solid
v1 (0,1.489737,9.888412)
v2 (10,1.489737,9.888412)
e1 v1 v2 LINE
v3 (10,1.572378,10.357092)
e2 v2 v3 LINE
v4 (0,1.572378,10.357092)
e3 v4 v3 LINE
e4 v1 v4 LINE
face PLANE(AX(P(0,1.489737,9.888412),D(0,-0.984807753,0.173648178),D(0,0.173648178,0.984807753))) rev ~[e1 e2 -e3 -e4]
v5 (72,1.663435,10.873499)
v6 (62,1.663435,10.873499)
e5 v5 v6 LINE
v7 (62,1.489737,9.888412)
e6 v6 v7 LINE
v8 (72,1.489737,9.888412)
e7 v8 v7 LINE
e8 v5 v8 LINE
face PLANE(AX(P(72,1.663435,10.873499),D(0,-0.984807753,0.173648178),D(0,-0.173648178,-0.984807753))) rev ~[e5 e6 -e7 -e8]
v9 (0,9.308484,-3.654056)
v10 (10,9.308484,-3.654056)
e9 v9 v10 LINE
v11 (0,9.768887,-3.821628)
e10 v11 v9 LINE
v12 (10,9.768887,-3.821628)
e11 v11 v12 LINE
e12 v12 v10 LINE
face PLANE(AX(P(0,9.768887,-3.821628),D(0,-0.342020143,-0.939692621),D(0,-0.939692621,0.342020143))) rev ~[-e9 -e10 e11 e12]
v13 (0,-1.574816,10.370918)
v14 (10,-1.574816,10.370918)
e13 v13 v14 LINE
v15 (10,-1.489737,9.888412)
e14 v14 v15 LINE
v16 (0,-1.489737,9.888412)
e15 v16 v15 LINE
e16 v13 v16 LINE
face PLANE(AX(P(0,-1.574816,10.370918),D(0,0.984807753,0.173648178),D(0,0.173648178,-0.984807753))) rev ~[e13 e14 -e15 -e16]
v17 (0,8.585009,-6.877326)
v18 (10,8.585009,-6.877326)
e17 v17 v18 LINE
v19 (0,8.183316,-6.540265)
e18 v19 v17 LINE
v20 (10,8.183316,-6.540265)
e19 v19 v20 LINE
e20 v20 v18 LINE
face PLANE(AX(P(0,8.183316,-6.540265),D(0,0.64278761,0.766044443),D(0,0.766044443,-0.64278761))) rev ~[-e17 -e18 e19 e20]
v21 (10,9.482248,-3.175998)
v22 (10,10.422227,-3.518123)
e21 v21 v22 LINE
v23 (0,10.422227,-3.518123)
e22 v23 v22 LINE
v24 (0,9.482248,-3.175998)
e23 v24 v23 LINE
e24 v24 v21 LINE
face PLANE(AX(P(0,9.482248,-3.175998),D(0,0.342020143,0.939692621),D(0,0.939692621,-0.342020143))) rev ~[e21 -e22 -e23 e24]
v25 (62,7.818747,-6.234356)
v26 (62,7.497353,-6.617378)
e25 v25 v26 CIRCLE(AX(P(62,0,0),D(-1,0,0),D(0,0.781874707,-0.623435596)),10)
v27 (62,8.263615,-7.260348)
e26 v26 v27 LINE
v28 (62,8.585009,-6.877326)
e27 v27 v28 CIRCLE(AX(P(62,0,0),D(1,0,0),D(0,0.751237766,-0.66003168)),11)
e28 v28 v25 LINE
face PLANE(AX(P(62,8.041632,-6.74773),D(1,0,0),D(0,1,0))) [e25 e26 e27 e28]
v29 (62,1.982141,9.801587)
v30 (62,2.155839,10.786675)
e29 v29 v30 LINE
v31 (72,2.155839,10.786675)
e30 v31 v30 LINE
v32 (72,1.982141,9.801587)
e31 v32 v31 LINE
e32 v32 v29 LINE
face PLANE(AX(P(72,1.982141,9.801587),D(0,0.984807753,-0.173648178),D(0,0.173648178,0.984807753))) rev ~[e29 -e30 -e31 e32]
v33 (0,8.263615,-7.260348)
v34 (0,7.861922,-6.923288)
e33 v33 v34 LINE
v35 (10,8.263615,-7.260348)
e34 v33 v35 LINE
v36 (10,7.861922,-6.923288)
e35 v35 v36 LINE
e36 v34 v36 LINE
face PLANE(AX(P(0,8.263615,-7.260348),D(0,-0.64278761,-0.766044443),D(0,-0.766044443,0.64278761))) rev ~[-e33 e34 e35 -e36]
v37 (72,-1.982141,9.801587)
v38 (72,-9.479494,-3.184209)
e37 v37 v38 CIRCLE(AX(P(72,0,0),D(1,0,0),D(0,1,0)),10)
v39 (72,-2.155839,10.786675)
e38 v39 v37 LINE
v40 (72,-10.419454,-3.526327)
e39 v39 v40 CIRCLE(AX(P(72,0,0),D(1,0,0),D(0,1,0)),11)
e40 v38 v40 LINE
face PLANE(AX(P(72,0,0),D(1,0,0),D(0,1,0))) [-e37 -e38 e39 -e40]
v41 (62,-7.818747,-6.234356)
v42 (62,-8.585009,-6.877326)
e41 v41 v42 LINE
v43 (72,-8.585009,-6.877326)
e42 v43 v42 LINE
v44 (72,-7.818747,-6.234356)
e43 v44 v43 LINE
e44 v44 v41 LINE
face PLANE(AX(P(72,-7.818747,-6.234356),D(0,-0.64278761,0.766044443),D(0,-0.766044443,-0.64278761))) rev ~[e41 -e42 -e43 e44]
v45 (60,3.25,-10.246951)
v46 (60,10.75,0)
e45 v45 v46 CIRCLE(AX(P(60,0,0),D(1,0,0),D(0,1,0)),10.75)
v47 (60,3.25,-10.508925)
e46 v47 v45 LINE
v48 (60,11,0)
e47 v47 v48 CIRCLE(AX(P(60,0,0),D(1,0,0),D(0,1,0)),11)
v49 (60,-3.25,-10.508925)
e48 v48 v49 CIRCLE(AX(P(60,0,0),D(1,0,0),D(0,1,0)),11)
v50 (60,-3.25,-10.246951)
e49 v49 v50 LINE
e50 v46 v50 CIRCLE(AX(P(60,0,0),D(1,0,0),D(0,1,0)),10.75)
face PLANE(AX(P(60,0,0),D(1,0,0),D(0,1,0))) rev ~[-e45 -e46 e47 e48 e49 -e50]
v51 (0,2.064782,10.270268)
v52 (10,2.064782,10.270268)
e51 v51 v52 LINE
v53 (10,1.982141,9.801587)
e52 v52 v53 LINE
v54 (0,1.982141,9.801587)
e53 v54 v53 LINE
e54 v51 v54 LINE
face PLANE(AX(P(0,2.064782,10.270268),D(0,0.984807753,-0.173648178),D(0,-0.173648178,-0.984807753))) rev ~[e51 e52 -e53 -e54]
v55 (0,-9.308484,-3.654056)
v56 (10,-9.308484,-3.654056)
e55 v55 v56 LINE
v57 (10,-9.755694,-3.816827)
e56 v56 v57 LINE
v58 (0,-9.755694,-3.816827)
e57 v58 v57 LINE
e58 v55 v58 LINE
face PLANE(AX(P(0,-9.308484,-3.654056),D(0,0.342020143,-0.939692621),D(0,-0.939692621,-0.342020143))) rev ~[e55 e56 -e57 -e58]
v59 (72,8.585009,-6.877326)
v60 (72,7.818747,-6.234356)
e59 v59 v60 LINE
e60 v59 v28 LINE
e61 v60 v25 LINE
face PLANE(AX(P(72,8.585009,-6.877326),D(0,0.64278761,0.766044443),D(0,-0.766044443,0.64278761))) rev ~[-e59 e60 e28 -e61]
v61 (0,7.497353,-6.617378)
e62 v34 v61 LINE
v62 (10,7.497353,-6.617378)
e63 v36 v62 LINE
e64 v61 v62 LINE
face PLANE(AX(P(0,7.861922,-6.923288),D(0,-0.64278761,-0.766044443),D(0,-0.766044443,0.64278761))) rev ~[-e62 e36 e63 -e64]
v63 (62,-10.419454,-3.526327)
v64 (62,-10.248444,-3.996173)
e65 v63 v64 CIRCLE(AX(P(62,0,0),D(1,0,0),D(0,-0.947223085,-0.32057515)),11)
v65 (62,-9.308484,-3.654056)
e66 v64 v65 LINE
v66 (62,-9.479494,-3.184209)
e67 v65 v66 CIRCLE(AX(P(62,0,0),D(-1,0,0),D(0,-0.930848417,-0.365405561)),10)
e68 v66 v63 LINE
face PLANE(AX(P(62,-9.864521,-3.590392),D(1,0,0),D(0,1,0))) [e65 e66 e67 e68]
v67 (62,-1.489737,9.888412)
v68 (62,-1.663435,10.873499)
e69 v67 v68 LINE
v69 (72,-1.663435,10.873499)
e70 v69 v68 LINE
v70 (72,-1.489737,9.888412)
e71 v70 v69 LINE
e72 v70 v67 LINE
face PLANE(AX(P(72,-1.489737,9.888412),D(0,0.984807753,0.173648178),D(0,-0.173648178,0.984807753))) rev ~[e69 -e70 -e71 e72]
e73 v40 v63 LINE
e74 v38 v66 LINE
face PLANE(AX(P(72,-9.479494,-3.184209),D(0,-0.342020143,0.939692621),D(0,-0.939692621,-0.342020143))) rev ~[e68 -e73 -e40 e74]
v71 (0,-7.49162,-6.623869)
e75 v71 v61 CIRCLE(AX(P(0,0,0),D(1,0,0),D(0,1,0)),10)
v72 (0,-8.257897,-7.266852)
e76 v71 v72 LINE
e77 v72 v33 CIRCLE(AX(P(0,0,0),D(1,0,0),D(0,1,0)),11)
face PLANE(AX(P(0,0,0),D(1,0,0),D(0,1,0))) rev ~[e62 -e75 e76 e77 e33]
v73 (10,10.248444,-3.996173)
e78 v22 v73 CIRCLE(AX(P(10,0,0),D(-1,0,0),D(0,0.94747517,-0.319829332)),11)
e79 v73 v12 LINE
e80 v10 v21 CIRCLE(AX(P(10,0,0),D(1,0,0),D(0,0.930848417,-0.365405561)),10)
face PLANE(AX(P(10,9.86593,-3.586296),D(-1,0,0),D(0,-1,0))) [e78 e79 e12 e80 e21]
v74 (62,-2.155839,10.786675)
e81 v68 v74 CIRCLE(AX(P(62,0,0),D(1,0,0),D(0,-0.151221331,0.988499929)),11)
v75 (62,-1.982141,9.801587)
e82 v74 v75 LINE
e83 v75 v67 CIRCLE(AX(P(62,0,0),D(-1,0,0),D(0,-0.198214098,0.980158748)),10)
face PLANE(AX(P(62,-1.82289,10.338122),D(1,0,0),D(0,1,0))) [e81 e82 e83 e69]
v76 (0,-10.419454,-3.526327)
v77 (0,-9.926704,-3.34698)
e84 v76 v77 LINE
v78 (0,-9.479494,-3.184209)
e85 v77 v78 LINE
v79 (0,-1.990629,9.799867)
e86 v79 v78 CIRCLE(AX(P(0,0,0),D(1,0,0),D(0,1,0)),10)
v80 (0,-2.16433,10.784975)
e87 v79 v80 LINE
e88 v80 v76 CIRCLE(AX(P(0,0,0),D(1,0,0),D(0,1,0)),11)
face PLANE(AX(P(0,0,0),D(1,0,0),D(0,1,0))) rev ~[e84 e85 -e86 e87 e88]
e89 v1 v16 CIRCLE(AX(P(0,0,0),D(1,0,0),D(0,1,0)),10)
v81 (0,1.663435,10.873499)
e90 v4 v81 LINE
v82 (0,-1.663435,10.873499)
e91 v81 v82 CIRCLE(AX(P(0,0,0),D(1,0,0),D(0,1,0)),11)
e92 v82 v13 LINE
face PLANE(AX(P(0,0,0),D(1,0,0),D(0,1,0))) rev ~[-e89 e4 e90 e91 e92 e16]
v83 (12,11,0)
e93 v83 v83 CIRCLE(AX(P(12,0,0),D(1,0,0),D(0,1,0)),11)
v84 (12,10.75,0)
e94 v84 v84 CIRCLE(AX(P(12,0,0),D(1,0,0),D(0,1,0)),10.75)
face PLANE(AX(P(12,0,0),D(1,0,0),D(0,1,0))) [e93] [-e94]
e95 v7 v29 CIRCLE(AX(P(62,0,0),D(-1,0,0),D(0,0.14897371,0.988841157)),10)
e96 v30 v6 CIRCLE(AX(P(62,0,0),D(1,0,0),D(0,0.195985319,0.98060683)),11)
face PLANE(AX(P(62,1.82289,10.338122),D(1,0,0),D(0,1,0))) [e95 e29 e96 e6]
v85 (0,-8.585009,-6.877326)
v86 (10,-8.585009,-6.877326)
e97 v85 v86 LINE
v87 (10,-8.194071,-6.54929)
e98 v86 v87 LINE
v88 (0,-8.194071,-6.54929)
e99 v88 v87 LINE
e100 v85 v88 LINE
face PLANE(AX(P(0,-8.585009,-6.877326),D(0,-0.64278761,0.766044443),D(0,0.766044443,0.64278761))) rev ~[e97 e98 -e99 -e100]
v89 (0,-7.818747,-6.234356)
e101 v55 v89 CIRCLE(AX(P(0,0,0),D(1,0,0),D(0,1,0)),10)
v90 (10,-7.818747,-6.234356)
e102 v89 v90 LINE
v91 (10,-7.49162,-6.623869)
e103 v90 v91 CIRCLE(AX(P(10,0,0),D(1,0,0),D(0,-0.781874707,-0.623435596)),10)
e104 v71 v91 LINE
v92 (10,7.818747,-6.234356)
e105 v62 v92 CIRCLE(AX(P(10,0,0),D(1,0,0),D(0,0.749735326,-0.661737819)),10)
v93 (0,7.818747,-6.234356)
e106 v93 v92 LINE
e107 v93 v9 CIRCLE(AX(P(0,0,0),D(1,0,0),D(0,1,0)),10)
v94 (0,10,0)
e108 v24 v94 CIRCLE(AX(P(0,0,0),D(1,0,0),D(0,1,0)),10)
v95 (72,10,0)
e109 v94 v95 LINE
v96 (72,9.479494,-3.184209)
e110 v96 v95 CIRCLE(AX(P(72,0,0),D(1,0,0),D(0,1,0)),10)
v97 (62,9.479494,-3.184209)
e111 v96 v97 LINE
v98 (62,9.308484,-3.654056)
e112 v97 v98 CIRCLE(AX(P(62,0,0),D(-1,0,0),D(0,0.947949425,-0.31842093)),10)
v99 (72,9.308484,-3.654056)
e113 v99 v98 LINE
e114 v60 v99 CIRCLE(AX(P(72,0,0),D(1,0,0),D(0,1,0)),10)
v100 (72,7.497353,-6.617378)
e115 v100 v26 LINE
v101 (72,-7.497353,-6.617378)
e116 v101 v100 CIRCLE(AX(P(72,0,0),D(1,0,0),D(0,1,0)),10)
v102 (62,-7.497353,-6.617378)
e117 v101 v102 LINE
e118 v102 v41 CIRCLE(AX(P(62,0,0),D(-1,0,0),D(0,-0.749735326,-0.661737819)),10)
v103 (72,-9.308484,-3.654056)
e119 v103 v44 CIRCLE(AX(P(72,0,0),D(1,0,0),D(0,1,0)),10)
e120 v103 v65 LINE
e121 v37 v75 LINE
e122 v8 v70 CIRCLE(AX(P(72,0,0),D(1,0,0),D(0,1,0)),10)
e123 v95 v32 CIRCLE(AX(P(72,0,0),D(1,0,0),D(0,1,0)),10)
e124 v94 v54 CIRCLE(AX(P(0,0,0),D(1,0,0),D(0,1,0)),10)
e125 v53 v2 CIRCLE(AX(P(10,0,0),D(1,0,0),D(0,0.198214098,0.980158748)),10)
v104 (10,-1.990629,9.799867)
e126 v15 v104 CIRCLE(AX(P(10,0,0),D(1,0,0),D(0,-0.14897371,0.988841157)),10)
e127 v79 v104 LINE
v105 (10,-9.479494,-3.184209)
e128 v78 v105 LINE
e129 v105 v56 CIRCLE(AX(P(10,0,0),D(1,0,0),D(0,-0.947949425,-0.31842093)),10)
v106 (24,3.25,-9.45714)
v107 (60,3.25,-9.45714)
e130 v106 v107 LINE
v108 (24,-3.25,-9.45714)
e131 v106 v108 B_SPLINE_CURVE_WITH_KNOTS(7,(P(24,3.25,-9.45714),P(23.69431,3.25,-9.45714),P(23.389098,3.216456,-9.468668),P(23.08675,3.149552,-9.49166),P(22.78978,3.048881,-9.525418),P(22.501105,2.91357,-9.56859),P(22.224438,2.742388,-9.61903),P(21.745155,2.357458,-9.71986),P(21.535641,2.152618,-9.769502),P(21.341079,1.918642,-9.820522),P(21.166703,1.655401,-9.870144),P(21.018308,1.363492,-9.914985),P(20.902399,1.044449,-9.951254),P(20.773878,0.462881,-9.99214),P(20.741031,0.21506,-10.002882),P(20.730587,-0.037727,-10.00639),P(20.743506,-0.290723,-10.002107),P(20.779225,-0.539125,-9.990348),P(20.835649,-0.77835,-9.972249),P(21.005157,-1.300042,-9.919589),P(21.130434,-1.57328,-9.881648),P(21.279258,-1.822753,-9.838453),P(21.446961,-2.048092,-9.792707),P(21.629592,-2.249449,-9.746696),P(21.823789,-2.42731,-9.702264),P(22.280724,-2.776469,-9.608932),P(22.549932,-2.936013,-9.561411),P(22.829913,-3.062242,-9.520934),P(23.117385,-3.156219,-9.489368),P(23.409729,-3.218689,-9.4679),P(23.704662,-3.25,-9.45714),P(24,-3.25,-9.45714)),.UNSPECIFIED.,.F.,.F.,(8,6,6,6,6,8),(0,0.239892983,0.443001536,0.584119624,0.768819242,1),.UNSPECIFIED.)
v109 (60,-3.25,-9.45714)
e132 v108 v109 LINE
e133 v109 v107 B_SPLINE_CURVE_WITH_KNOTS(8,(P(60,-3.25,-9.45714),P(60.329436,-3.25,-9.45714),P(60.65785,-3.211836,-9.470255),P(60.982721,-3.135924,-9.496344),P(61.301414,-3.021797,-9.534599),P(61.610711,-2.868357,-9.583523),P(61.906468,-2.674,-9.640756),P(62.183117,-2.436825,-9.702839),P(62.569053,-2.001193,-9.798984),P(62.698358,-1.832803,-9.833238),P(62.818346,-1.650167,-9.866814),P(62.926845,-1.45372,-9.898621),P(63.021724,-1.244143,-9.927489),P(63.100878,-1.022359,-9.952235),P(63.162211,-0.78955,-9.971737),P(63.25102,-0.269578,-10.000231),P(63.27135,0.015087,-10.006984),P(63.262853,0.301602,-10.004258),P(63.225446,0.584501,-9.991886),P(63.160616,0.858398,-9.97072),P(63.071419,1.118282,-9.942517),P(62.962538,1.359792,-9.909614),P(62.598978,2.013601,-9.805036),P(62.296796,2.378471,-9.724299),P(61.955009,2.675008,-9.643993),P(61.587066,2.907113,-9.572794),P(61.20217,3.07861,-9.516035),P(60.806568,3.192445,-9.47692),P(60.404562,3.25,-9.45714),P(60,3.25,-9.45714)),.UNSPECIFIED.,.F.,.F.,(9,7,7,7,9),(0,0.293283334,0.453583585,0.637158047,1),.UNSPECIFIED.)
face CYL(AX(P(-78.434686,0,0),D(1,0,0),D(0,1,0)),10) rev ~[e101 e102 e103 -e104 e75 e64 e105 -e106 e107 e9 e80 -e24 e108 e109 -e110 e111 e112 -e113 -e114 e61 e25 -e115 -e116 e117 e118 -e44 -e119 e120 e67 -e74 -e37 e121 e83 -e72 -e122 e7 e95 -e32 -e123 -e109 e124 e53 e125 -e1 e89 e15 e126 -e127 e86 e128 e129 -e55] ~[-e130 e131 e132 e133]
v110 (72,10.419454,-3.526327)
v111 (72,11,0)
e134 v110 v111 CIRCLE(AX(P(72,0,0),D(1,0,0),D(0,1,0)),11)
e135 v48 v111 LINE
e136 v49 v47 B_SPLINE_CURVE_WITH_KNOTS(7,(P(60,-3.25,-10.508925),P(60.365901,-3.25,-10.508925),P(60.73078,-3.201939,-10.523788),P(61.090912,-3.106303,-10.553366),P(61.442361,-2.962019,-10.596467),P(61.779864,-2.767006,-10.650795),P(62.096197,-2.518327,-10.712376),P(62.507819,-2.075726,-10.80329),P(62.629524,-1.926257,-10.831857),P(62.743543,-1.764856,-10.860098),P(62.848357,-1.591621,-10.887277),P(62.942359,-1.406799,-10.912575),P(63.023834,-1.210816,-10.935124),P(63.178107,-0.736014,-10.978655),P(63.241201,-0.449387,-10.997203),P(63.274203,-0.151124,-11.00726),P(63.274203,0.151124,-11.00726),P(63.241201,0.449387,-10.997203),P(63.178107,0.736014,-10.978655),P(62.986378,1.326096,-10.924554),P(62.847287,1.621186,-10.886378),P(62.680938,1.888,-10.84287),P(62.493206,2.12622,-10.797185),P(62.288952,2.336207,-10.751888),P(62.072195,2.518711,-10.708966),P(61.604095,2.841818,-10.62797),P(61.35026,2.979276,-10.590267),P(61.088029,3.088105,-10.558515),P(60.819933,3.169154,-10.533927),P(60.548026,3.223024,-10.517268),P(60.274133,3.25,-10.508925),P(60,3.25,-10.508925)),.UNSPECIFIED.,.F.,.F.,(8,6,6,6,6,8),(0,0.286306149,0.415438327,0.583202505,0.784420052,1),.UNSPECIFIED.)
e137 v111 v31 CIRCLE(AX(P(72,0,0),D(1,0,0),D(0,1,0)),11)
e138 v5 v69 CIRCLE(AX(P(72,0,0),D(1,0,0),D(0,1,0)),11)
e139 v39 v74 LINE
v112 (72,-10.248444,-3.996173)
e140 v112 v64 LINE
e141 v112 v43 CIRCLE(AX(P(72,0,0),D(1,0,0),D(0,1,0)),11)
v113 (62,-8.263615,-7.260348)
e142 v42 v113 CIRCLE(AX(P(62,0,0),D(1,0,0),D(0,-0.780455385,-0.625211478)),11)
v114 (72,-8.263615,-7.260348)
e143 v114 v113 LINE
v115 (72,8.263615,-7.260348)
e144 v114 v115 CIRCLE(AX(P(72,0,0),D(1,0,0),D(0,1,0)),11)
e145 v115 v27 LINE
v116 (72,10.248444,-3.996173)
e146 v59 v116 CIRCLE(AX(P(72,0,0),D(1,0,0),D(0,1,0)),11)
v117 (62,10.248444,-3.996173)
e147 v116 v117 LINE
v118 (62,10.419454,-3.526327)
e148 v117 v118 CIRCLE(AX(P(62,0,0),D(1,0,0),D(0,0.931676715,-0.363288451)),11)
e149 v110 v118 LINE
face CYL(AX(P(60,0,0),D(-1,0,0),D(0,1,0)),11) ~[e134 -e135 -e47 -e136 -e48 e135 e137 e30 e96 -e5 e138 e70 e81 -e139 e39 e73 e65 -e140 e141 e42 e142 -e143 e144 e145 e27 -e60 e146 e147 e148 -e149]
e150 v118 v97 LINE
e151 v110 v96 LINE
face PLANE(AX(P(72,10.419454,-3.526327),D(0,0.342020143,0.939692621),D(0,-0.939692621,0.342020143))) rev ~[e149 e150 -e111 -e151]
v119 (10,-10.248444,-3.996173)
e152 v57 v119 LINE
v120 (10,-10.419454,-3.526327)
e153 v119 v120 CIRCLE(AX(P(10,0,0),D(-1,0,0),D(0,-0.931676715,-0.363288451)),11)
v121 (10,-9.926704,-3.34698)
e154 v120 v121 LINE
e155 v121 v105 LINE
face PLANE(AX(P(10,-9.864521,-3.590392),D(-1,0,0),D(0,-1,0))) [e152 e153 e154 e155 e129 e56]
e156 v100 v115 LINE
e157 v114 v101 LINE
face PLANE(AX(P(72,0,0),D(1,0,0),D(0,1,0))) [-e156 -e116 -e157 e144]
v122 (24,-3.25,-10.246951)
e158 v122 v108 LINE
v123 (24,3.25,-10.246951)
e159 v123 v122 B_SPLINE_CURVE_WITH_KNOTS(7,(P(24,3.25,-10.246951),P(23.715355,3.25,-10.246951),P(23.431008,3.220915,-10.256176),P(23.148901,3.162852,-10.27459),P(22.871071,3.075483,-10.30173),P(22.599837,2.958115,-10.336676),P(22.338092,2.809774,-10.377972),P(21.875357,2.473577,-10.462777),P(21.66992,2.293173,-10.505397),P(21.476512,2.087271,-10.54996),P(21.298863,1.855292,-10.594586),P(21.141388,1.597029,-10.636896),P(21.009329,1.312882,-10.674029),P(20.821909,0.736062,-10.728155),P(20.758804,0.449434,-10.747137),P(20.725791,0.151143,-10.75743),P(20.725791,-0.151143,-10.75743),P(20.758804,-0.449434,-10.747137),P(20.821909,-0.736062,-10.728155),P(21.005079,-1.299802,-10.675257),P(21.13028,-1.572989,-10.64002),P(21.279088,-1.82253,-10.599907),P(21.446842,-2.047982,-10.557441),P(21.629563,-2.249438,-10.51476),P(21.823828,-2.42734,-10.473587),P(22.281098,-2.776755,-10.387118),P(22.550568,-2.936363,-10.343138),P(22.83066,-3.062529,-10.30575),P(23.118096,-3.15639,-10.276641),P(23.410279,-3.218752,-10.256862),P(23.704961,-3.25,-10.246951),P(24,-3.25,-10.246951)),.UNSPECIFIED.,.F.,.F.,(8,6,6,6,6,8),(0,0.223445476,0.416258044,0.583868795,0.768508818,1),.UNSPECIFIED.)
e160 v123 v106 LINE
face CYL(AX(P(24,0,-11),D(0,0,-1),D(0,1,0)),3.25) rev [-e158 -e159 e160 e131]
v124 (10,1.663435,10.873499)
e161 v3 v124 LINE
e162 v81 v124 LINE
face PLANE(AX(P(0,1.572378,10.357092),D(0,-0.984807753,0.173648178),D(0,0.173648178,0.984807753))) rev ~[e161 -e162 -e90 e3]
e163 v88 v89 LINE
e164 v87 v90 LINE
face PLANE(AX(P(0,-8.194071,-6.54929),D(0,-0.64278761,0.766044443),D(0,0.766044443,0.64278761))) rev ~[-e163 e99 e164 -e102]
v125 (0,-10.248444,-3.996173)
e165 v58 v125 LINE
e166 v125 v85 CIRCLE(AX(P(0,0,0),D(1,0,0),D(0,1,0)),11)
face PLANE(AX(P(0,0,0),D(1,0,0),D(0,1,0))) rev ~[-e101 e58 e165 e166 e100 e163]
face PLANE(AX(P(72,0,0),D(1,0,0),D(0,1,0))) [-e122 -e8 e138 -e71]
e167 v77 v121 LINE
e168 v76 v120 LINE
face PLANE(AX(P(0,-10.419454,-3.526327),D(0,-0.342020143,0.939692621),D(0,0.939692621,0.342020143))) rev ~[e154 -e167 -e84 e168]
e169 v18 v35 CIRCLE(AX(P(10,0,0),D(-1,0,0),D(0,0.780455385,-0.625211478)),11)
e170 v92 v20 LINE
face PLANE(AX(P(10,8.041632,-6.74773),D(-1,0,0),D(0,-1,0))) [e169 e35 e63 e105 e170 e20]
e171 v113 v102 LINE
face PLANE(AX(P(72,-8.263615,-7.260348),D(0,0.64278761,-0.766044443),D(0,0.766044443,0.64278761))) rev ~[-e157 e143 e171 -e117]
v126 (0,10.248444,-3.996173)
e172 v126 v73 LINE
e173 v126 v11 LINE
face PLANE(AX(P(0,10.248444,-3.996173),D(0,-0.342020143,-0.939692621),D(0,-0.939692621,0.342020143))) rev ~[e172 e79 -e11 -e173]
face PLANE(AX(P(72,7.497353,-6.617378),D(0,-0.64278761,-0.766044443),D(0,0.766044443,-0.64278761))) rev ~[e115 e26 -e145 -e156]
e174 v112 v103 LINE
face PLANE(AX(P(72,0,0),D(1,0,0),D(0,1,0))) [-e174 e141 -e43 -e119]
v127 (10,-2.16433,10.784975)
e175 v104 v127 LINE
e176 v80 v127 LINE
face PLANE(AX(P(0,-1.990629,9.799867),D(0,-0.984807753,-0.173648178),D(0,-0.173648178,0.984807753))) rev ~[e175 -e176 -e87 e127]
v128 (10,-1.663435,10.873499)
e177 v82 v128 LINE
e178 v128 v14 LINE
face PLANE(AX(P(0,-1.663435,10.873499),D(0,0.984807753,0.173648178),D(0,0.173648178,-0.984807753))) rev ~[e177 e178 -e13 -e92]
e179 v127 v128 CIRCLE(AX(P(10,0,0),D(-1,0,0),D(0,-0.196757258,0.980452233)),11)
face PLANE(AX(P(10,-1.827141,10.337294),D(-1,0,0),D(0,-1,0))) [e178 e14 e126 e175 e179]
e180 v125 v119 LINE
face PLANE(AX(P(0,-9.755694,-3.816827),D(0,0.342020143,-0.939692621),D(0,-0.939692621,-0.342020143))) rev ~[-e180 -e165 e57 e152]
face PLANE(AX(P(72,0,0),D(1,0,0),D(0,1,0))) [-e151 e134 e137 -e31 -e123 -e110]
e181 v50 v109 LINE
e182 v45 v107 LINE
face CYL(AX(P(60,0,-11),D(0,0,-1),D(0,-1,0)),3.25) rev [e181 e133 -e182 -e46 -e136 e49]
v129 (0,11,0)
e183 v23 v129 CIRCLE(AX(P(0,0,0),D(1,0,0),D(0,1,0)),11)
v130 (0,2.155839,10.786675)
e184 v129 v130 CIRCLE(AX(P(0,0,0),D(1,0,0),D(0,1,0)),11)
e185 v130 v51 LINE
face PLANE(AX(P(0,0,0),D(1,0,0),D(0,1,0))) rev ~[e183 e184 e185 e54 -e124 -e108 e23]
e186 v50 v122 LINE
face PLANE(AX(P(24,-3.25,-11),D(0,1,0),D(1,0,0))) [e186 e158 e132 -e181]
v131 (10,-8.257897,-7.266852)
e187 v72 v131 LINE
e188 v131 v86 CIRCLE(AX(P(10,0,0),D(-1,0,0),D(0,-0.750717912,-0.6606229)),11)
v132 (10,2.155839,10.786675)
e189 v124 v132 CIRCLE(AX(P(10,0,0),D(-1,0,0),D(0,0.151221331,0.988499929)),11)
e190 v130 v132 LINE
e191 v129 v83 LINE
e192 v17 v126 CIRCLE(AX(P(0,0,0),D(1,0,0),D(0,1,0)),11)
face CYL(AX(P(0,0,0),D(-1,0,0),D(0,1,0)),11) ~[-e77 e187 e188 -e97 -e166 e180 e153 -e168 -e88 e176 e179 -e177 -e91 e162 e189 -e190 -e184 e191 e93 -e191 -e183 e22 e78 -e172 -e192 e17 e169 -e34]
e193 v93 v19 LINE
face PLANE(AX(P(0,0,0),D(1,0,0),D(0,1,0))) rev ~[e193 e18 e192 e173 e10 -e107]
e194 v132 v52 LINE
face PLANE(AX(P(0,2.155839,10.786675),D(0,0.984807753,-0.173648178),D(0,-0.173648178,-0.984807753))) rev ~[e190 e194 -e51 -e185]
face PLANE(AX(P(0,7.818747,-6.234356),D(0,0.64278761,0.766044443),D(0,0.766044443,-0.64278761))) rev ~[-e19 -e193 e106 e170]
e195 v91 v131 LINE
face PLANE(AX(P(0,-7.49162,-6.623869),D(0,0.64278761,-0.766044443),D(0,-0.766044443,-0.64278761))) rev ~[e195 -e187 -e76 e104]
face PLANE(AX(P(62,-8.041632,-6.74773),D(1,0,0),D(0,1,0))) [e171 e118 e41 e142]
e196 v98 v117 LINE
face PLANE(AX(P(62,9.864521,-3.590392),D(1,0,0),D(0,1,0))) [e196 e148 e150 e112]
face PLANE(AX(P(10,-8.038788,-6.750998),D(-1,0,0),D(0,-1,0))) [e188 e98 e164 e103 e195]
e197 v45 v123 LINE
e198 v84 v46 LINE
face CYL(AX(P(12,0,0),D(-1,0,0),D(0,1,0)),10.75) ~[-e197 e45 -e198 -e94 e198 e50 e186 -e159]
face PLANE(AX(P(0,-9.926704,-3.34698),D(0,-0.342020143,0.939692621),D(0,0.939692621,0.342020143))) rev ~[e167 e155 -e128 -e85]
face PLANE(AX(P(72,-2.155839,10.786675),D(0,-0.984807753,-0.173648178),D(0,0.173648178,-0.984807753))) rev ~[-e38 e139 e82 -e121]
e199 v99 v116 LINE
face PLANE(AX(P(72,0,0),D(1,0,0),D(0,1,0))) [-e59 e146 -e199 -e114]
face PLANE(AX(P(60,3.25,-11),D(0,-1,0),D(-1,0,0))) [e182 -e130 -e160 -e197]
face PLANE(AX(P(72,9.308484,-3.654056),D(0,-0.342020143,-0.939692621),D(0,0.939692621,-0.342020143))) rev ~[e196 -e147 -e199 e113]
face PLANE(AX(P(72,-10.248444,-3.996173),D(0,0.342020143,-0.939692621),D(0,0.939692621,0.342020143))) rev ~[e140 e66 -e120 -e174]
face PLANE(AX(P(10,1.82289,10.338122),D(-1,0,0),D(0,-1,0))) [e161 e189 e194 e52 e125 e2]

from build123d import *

# Parameters (mm, degrees)
F0_R      = 11
F1_DEPTH  = 12
F2_R      = 10.75
F3_DEPTH  = 48
F4_R      = 11
F4_R_2    = 10.75
F5_DEPTH  = 12
F7_D      = 20
F9_DEPTH  = 10
F11_DEPTH = 10
F14_DEPTH = 5


with BuildPart() as f1:
    # F0 (on Right) → F1 (new body)
    with BuildSketch(Plane.YZ):
        Circle(F0_R)
    extrude(amount=F1_DEPTH)

    # F2 (on face) → F3 (join)
    with BuildSketch(Plane.YZ.offset(12)):
        Circle(F2_R)
    extrude(amount=F3_DEPTH)

    # F4 (on face) → F5 (join)
    with BuildSketch(Plane.YZ.offset(60)):
        Circle(F4_R)
        Circle(F4_R_2, mode=Mode.SUBTRACT)
        Circle(F4_R_2)
    extrude(amount=F5_DEPTH)

    # F7 (through all)
    with Locations(Plane(origin=(0, 0, 0), x_dir=(0, -1, 0), z_dir=(-1, 0, 0))):
        with Locations((0, 0)):
            Hole(F7_D / 2)

    # F8 (on face) → F9 (cut)
    with BuildSketch(Plane(origin=(0, 0, 0), x_dir=(0, -1, 0), z_dir=(-1, 0, 0))):
        with BuildLine():
            Line((1.6634346337, 10.8734992169), (1.5748160855, 10.370918456))
            Line((1.5748160855, 10.370918456), (1.489737103, 9.8884115693))
            ThreePointArc((1.489737103, 9.8884115693), (1.7407460416, 9.8473246732), (1.9906288286, 9.7998671862))
            Line((1.9906288286, 9.7998671862), (2.1643298383, 10.7849745642))
            ThreePointArc((2.1643298383, 10.7849745642), (1.9143939946, 10.8321325524), (1.6634346337, 10.8734992169))
        make_face()
        with BuildLine():
            ThreePointArc((-1.9821409796, 9.8015874805), (-1.7364817767, 9.8480775301), (-1.489737103, 9.8884115693))
            Line((-1.489737103, 9.8884115693), (-1.572378121, 10.3570920718))
            Line((-1.572378121, 10.3570920718), (-1.6634346337, 10.8734992169))
            ThreePointArc((-1.6634346337, 10.8734992169), (-1.9101299543, 10.8328852831), (-2.1558385102, 10.786675128))
            Line((-2.1558385102, 10.786675128), (-2.0647819975, 10.270267983))
            Line((-2.0647819975, 10.270267983), (-1.9821409796, 9.8015874805))
        make_face()
        with BuildLine():
            Line((9.9267039757, -3.3469803284), (9.4794942453, -3.1842092981))
            ThreePointArc((9.4794942453, -3.1842092981), (9.3969262079, -3.4202014333), (9.3084841736, -3.6540556085))
            Line((9.3084841736, -3.6540556085), (9.755693904, -3.8168266388))
            Line((9.755693904, -3.8168266388), (10.2484438667, -3.9961729581))
            ThreePointArc((10.2484438667, -3.9961729581), (10.3366188286, -3.7622215766), (10.4194539383, -3.5263266477))
            Line((10.4194539383, -3.5263266477), (9.9267039757, -3.3469803284))
        make_face()
        with BuildLine():
            ThreePointArc((-9.3084841736, -3.6540556085), (-9.3984063471, -3.416132043), (-9.4822483512, -3.175998458))
            Line((-9.4822483512, -3.175998458), (-10.4222268709, -3.51812266))
            ThreePointArc((-10.4222268709, -3.51812266), (-10.3380989649, -3.758152444), (-10.2484438667, -3.9961729581))
            Line((-10.2484438667, -3.9961729581), (-9.7688868862, -3.8216284916))
            Line((-9.7688868862, -3.8216284916), (-9.3084841736, -3.6540556085))
        make_face()
        with BuildLine():
            Line((8.1940708007, -6.5492899644), (7.8187470706, -6.2343559608))
            ThreePointArc((7.8187470706, -6.2343559608), (7.6576603054, -6.4311926302), (7.4916195226, -6.6238687282))
            Line((7.4916195226, -6.6238687282), (8.2578970327, -7.2668519042))
            ThreePointArc((8.2578970327, -7.2668519042), (8.4237049702, -7.0739801084), (8.585009233, -6.8773262587))
            Line((8.585009233, -6.8773262587), (8.1940708007, -6.5492899644))
        make_face()
        with BuildLine():
            ThreePointArc((-7.4973532657, -6.6173781824), (-7.6604444312, -6.4278760969), (-7.8187470706, -6.2343559608))
            Line((-7.8187470706, -6.2343559608), (-8.1833157831, -6.540265433))
            Line((-8.1833157831, -6.540265433), (-8.585009233, -6.8773262587))
            ThreePointArc((-8.585009233, -6.8773262587), (-8.4264888743, -7.0706637066), (-8.2636154282, -7.2603484803))
            Line((-8.2636154282, -7.2603484803), (-7.8619219782, -6.9232876546))
            Line((-7.8619219782, -6.9232876546), (-7.4973532657, -6.6173781824))
        make_face()
    extrude(amount=-F9_DEPTH, mode=Mode.SUBTRACT)

    # F10 (on face) → F11 (cut)
    with BuildSketch(Plane.YZ.offset(72)):
        with BuildLine():
            ThreePointArc((-1.9821409796, 9.8015874805), (-1.7364817767, 9.8480775301), (-1.489737103, 9.8884115693))
            Line((-1.489737103, 9.8884115693), (-1.6634346337, 10.8734992169))
            ThreePointArc((-1.6634346337, 10.8734992169), (-1.9101299543, 10.8328852831), (-2.1558385102, 10.786675128))
            Line((-2.1558385102, 10.786675128), (-1.9821409796, 9.8015874805))
        make_face()
        with BuildLine():
            Line((1.6634346337, 10.8734992169), (1.489737103, 9.8884115693))
            ThreePointArc((1.489737103, 9.8884115693), (1.7364817767, 9.8480775301), (1.9821409796, 9.8015874805))
            Line((1.9821409796, 9.8015874805), (2.1558385102, 10.786675128))
            ThreePointArc((2.1558385102, 10.786675128), (1.9101299543, 10.8328852831), (1.6634346337, 10.8734992169))
        make_face()
        with BuildLine():
            Line((10.4194539383, -3.5263266477), (9.4794942453, -3.1842092981))
            ThreePointArc((9.4794942453, -3.1842092981), (9.3969262079, -3.4202014333), (9.3084841736, -3.6540556085))
            Line((9.3084841736, -3.6540556085), (10.2484438667, -3.9961729581))
            ThreePointArc((10.2484438667, -3.9961729581), (10.3366188286, -3.7622215766), (10.4194539383, -3.5263266477))
        make_face()
        with BuildLine():
            Line((8.585009233, -6.8773262587), (7.8187470706, -6.2343559608))
            ThreePointArc((7.8187470706, -6.2343559608), (7.6604444312, -6.4278760969), (7.4973532657, -6.6173781824))
            Line((7.4973532657, -6.6173781824), (8.2636154282, -7.2603484803))
            ThreePointArc((8.2636154282, -7.2603484803), (8.4264888743, -7.0706637066), (8.585009233, -6.8773262587))
        make_face()
        with BuildLine():
            ThreePointArc((-9.3084841736, -3.6540556085), (-9.3969262079, -3.4202014333), (-9.4794942453, -3.1842092981))
            Line((-9.4794942453, -3.1842092981), (-10.4194539383, -3.5263266477))
            ThreePointArc((-10.4194539383, -3.5263266477), (-10.3366188286, -3.7622215766), (-10.2484438667, -3.9961729581))
            Line((-10.2484438667, -3.9961729581), (-9.3084841736, -3.6540556085))
        make_face()
        with BuildLine():
            ThreePointArc((-7.4973532657, -6.6173781824), (-7.6604444312, -6.4278760969), (-7.8187470706, -6.2343559608))
            Line((-7.8187470706, -6.2343559608), (-8.585009233, -6.8773262587))
            ThreePointArc((-8.585009233, -6.8773262587), (-8.4264888743, -7.0706637066), (-8.2636154282, -7.2603484803))
            Line((-8.2636154282, -7.2603484803), (-7.4973532657, -6.6173781824))
        make_face()
    extrude(amount=-F11_DEPTH, mode=Mode.SUBTRACT)

    # F13 (on offset) → F14 (cut)
    with BuildSketch(Plane.XY.offset(-11)):
        with BuildLine():
            Line((24, -3.25), (60, -3.25))
            ThreePointArc((60, -3.25), (63.25, 0), (60, 3.25))
            Line((60, 3.25), (24, 3.25))
            ThreePointArc((24, 3.25), (20.75, 0), (24, -3.25))
        make_face()
    extrude(amount=F14_DEPTH, mode=Mode.SUBTRACT)


solid = f1.part
